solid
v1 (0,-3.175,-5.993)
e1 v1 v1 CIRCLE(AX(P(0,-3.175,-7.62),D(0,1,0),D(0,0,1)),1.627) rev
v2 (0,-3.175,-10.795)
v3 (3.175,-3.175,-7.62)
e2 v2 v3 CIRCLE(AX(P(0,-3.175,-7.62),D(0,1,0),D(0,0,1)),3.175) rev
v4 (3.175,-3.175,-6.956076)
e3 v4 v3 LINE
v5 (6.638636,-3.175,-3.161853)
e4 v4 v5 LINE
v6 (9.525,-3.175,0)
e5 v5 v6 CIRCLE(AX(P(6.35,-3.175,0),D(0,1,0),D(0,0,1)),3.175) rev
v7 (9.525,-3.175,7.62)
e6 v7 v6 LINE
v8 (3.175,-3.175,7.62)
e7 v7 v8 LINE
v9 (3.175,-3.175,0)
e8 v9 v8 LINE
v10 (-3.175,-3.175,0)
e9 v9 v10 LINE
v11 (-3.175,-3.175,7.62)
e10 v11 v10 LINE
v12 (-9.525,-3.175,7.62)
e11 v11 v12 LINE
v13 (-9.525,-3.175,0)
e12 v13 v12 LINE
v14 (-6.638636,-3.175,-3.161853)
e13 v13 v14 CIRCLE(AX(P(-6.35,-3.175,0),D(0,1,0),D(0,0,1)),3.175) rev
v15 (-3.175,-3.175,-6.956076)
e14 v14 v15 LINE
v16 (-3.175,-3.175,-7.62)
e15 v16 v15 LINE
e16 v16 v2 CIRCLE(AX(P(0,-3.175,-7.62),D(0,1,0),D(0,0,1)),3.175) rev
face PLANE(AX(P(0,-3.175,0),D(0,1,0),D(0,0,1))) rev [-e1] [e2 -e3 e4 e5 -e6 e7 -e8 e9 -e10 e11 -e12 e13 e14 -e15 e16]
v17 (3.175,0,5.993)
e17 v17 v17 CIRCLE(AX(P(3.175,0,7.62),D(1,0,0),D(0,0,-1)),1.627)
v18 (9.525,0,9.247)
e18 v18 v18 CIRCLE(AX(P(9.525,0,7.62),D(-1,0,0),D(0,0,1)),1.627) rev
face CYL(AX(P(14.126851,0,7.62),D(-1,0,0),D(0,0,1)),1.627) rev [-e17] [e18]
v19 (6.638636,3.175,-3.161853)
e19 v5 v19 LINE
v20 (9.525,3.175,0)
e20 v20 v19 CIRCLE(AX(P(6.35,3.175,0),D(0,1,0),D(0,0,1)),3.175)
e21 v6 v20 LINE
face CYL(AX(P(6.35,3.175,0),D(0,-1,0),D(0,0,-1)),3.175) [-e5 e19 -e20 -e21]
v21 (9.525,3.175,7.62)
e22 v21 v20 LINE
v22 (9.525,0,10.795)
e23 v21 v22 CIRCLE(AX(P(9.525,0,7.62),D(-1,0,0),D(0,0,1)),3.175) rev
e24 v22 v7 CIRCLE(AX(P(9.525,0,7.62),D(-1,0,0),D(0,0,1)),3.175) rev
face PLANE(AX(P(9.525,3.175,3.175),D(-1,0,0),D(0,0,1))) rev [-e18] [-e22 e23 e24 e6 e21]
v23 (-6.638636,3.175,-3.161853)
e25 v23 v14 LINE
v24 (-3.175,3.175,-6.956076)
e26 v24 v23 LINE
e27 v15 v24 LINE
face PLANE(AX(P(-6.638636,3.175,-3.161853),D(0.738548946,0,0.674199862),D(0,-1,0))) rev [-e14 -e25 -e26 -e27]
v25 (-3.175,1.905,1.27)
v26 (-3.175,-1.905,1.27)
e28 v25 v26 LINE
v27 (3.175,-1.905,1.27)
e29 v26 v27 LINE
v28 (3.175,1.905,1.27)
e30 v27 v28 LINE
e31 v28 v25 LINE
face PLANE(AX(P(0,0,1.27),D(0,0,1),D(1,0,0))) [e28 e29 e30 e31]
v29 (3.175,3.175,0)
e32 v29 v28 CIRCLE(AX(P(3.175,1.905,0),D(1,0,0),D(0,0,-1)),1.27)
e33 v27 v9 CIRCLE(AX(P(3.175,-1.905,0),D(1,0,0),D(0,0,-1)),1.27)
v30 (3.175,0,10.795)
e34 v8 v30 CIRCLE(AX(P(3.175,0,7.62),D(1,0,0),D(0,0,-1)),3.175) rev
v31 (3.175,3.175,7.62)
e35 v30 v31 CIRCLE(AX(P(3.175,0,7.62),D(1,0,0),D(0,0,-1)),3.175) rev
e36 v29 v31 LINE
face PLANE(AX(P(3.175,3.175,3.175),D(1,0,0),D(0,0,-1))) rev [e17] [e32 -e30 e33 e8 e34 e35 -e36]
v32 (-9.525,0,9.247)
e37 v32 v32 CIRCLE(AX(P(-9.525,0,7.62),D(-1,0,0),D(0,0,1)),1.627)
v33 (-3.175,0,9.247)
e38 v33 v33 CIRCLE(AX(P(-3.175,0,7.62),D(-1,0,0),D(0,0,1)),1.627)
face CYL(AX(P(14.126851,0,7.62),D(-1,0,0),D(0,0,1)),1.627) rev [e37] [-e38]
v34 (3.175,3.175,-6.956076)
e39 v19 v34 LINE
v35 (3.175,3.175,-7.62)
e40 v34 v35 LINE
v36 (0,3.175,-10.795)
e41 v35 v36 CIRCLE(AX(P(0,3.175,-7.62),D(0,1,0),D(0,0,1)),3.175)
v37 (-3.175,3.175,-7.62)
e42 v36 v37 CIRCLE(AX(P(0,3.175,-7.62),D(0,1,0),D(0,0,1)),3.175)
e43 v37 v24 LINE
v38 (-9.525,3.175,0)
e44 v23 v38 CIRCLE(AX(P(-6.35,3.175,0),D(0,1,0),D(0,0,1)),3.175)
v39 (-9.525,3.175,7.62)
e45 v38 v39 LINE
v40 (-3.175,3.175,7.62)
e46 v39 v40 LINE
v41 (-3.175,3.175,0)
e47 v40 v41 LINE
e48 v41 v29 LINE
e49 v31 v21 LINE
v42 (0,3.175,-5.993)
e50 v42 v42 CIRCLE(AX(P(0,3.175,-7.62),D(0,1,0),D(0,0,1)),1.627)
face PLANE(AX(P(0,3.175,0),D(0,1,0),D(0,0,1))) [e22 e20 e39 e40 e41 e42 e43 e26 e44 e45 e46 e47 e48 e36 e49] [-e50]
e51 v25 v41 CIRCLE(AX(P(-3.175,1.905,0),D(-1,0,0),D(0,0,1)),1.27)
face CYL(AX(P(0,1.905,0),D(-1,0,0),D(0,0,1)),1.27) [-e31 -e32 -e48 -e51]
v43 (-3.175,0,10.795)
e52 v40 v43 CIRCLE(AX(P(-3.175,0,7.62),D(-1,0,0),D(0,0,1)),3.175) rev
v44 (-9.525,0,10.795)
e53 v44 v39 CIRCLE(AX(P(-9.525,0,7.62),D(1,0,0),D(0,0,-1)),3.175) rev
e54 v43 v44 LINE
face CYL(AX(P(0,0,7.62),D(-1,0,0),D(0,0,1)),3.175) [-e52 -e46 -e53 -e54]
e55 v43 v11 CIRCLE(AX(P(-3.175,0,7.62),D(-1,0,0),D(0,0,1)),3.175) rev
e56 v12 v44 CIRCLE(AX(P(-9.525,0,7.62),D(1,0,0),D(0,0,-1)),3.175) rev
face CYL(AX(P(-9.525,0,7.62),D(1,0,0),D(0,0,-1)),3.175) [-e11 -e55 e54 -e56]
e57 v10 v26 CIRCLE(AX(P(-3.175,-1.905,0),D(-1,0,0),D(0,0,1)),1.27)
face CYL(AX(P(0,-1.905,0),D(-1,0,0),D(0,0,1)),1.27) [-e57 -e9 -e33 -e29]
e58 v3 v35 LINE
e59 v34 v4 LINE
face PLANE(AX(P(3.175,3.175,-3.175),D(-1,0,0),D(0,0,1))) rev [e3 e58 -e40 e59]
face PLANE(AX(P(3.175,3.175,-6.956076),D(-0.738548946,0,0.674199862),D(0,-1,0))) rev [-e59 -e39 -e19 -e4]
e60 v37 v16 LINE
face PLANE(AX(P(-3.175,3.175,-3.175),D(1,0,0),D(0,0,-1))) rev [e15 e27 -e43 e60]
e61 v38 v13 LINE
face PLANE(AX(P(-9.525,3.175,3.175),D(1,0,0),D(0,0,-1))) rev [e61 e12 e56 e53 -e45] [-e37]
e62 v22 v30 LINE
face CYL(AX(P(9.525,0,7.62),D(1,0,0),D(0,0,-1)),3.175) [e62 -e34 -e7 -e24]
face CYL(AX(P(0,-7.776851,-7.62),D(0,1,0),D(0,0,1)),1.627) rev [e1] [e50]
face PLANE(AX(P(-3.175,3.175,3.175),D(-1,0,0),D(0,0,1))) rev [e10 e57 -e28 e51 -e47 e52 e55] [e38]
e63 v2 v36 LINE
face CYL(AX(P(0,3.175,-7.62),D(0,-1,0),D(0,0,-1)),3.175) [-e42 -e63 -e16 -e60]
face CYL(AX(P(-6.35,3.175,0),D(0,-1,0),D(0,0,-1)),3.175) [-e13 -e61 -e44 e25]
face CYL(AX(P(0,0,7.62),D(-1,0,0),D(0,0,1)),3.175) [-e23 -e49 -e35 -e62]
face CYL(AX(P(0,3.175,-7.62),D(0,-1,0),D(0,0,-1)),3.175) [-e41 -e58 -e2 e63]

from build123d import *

# Parameters (mm, degrees)
BOSS_EXTRUDE1_DEPTH = 3.175
FILLET1_R           = 3.175
CUT_EXTRUDE1_REACH  = 24.125
SKETCH2_R           = 1.627
SKETCH3_R           = 1.627
CUT_EXTRUDE2_DEPTH  = 6.35
SKETCH4_W           = 6.35
SKETCH4_H           = 6.35
CUT_EXTRUDE3_DEPTH  = 1.905
FILLET2_R           = 1.27
CHAMFER1_START      = -3.175
CHAMFER1_DEPTH      = 6.35


with BuildPart() as part:
    # Sketch1 → Boss-Extrude1 (new, symmetric)
    with BuildSketch(Plane(origin=(0, 0, 0), x_dir=(1, 0, 0), z_dir=(0, 1, 0))):
        Polygon((-3.175, 3.175), (-9.525, 3.175), (-9.525, -3.175), (-9.525, -10.795), (-3.175, -10.795), (-3.175, -3.175), (3.175, -3.175), (3.175, -10.795), (9.525, -10.795), (9.525, -3.175), (9.525, 3.175), (3.175, 3.175), (3.175, 10.795), (-3.175, 10.795), align=None)
    extrude(amount=BOSS_EXTRUDE1_DEPTH, both=True)

    # Fillet1
    fillet1_edges = [part.edges().sort_by_distance(p)[0] for p in [
        (3.175, 0, -10.795),
        (-3.175, 0, -10.795),
        (6.35, -3.175, 10.795),
        (6.35, 3.175, 10.795),
        (-6.35, -3.175, 10.795),
        (-6.35, 3.175, 10.795),
        (-9.525, 0, -3.175),
        (9.525, 0, -3.175),
    ]]
    fillet(fillet1_edges, radius=FILLET1_R - 0.0001)  # a hair under: the kernel refuses the full size

    # Cut-Extrude1: up to this face of the body (flat: up to its plane)
    cut_extrude1_end = Plane(part.part.faces().sort_by_distance((9.525, 0, 5.081615958))[0])
    # Sketch2 → Cut-Extrude1 (cut, up to the picked face)
    with BuildSketch(Plane.ZY.offset(9.525), mode=Mode.PRIVATE) as cut_extrude1_sk1:
        with Locations((7.62, 0)):
            Circle(SKETCH2_R)
    cut_extrude1_tool1 = split(extrude(cut_extrude1_sk1.sketch, amount=-CUT_EXTRUDE1_REACH, mode=Mode.PRIVATE), bisect_by=cut_extrude1_end, keep=Keep.BOTH, mode=Mode.PRIVATE)
    add(cut_extrude1_tool1.solids().sort_by(Axis((-9.525, 0, 7.62), (1, 0, 0)))[0], mode=Mode.SUBTRACT)

    # Sketch3 → Cut-Extrude2 (cut)
    with BuildSketch(Plane(origin=(0, 3.175, 0), x_dir=(1, 0, 0), z_dir=(0, 1, 0))):
        with Locations(Location((0, 7.62, 0), (0, 0, 270))):
            Circle(SKETCH3_R)
    extrude(amount=-CUT_EXTRUDE2_DEPTH, mode=Mode.SUBTRACT)

    # Sketch4 → Cut-Extrude3 (cut)
    with BuildSketch(Plane.XY.offset(3.175)):
        Rectangle(SKETCH4_W, SKETCH4_H)
    extrude(amount=-CUT_EXTRUDE3_DEPTH, mode=Mode.SUBTRACT)

    # Fillet2
    fillet2_edges = [part.edges().sort_by_distance(p)[0] for p in [
        (0, 3.175, 1.27),
        (0, -3.175, 1.27),
    ]]
    fillet(fillet2_edges, radius=FILLET2_R)

    # Chamfer1: read off the stored shape, not the designer's step
    # Chamfer1 outline → Chamfer1 (add)
    with BuildSketch(Plane(origin=(0, 0, 0), x_dir=(1, 0, 0), z_dir=(0, 1, 0)).offset(CHAMFER1_START)):
        with BuildLine():
            Line((6.638636364, 3.161852945), (3.175, 6.95607648))
            Line((3.175, 6.95607648), (3.175, 3.175))
            Line((3.175, 3.175), (6.35, 3.175))
            ThreePointArc((6.35, 3.175), (6.494467813, 3.171711533), (6.638636364, 3.161852945))
        make_face()
        with BuildLine():
            Line((-3.175, 6.95607648), (-6.638636364, 3.161852945))
            ThreePointArc((-6.638636364, 3.161852945), (-6.494467813, 3.171711533), (-6.35, 3.175))
            Line((-6.35, 3.175), (-3.175, 3.175))
            Line((-3.175, 3.175), (-3.175, 6.95607648))
        make_face()
    extrude(amount=CHAMFER1_DEPTH)


solid = part.part
